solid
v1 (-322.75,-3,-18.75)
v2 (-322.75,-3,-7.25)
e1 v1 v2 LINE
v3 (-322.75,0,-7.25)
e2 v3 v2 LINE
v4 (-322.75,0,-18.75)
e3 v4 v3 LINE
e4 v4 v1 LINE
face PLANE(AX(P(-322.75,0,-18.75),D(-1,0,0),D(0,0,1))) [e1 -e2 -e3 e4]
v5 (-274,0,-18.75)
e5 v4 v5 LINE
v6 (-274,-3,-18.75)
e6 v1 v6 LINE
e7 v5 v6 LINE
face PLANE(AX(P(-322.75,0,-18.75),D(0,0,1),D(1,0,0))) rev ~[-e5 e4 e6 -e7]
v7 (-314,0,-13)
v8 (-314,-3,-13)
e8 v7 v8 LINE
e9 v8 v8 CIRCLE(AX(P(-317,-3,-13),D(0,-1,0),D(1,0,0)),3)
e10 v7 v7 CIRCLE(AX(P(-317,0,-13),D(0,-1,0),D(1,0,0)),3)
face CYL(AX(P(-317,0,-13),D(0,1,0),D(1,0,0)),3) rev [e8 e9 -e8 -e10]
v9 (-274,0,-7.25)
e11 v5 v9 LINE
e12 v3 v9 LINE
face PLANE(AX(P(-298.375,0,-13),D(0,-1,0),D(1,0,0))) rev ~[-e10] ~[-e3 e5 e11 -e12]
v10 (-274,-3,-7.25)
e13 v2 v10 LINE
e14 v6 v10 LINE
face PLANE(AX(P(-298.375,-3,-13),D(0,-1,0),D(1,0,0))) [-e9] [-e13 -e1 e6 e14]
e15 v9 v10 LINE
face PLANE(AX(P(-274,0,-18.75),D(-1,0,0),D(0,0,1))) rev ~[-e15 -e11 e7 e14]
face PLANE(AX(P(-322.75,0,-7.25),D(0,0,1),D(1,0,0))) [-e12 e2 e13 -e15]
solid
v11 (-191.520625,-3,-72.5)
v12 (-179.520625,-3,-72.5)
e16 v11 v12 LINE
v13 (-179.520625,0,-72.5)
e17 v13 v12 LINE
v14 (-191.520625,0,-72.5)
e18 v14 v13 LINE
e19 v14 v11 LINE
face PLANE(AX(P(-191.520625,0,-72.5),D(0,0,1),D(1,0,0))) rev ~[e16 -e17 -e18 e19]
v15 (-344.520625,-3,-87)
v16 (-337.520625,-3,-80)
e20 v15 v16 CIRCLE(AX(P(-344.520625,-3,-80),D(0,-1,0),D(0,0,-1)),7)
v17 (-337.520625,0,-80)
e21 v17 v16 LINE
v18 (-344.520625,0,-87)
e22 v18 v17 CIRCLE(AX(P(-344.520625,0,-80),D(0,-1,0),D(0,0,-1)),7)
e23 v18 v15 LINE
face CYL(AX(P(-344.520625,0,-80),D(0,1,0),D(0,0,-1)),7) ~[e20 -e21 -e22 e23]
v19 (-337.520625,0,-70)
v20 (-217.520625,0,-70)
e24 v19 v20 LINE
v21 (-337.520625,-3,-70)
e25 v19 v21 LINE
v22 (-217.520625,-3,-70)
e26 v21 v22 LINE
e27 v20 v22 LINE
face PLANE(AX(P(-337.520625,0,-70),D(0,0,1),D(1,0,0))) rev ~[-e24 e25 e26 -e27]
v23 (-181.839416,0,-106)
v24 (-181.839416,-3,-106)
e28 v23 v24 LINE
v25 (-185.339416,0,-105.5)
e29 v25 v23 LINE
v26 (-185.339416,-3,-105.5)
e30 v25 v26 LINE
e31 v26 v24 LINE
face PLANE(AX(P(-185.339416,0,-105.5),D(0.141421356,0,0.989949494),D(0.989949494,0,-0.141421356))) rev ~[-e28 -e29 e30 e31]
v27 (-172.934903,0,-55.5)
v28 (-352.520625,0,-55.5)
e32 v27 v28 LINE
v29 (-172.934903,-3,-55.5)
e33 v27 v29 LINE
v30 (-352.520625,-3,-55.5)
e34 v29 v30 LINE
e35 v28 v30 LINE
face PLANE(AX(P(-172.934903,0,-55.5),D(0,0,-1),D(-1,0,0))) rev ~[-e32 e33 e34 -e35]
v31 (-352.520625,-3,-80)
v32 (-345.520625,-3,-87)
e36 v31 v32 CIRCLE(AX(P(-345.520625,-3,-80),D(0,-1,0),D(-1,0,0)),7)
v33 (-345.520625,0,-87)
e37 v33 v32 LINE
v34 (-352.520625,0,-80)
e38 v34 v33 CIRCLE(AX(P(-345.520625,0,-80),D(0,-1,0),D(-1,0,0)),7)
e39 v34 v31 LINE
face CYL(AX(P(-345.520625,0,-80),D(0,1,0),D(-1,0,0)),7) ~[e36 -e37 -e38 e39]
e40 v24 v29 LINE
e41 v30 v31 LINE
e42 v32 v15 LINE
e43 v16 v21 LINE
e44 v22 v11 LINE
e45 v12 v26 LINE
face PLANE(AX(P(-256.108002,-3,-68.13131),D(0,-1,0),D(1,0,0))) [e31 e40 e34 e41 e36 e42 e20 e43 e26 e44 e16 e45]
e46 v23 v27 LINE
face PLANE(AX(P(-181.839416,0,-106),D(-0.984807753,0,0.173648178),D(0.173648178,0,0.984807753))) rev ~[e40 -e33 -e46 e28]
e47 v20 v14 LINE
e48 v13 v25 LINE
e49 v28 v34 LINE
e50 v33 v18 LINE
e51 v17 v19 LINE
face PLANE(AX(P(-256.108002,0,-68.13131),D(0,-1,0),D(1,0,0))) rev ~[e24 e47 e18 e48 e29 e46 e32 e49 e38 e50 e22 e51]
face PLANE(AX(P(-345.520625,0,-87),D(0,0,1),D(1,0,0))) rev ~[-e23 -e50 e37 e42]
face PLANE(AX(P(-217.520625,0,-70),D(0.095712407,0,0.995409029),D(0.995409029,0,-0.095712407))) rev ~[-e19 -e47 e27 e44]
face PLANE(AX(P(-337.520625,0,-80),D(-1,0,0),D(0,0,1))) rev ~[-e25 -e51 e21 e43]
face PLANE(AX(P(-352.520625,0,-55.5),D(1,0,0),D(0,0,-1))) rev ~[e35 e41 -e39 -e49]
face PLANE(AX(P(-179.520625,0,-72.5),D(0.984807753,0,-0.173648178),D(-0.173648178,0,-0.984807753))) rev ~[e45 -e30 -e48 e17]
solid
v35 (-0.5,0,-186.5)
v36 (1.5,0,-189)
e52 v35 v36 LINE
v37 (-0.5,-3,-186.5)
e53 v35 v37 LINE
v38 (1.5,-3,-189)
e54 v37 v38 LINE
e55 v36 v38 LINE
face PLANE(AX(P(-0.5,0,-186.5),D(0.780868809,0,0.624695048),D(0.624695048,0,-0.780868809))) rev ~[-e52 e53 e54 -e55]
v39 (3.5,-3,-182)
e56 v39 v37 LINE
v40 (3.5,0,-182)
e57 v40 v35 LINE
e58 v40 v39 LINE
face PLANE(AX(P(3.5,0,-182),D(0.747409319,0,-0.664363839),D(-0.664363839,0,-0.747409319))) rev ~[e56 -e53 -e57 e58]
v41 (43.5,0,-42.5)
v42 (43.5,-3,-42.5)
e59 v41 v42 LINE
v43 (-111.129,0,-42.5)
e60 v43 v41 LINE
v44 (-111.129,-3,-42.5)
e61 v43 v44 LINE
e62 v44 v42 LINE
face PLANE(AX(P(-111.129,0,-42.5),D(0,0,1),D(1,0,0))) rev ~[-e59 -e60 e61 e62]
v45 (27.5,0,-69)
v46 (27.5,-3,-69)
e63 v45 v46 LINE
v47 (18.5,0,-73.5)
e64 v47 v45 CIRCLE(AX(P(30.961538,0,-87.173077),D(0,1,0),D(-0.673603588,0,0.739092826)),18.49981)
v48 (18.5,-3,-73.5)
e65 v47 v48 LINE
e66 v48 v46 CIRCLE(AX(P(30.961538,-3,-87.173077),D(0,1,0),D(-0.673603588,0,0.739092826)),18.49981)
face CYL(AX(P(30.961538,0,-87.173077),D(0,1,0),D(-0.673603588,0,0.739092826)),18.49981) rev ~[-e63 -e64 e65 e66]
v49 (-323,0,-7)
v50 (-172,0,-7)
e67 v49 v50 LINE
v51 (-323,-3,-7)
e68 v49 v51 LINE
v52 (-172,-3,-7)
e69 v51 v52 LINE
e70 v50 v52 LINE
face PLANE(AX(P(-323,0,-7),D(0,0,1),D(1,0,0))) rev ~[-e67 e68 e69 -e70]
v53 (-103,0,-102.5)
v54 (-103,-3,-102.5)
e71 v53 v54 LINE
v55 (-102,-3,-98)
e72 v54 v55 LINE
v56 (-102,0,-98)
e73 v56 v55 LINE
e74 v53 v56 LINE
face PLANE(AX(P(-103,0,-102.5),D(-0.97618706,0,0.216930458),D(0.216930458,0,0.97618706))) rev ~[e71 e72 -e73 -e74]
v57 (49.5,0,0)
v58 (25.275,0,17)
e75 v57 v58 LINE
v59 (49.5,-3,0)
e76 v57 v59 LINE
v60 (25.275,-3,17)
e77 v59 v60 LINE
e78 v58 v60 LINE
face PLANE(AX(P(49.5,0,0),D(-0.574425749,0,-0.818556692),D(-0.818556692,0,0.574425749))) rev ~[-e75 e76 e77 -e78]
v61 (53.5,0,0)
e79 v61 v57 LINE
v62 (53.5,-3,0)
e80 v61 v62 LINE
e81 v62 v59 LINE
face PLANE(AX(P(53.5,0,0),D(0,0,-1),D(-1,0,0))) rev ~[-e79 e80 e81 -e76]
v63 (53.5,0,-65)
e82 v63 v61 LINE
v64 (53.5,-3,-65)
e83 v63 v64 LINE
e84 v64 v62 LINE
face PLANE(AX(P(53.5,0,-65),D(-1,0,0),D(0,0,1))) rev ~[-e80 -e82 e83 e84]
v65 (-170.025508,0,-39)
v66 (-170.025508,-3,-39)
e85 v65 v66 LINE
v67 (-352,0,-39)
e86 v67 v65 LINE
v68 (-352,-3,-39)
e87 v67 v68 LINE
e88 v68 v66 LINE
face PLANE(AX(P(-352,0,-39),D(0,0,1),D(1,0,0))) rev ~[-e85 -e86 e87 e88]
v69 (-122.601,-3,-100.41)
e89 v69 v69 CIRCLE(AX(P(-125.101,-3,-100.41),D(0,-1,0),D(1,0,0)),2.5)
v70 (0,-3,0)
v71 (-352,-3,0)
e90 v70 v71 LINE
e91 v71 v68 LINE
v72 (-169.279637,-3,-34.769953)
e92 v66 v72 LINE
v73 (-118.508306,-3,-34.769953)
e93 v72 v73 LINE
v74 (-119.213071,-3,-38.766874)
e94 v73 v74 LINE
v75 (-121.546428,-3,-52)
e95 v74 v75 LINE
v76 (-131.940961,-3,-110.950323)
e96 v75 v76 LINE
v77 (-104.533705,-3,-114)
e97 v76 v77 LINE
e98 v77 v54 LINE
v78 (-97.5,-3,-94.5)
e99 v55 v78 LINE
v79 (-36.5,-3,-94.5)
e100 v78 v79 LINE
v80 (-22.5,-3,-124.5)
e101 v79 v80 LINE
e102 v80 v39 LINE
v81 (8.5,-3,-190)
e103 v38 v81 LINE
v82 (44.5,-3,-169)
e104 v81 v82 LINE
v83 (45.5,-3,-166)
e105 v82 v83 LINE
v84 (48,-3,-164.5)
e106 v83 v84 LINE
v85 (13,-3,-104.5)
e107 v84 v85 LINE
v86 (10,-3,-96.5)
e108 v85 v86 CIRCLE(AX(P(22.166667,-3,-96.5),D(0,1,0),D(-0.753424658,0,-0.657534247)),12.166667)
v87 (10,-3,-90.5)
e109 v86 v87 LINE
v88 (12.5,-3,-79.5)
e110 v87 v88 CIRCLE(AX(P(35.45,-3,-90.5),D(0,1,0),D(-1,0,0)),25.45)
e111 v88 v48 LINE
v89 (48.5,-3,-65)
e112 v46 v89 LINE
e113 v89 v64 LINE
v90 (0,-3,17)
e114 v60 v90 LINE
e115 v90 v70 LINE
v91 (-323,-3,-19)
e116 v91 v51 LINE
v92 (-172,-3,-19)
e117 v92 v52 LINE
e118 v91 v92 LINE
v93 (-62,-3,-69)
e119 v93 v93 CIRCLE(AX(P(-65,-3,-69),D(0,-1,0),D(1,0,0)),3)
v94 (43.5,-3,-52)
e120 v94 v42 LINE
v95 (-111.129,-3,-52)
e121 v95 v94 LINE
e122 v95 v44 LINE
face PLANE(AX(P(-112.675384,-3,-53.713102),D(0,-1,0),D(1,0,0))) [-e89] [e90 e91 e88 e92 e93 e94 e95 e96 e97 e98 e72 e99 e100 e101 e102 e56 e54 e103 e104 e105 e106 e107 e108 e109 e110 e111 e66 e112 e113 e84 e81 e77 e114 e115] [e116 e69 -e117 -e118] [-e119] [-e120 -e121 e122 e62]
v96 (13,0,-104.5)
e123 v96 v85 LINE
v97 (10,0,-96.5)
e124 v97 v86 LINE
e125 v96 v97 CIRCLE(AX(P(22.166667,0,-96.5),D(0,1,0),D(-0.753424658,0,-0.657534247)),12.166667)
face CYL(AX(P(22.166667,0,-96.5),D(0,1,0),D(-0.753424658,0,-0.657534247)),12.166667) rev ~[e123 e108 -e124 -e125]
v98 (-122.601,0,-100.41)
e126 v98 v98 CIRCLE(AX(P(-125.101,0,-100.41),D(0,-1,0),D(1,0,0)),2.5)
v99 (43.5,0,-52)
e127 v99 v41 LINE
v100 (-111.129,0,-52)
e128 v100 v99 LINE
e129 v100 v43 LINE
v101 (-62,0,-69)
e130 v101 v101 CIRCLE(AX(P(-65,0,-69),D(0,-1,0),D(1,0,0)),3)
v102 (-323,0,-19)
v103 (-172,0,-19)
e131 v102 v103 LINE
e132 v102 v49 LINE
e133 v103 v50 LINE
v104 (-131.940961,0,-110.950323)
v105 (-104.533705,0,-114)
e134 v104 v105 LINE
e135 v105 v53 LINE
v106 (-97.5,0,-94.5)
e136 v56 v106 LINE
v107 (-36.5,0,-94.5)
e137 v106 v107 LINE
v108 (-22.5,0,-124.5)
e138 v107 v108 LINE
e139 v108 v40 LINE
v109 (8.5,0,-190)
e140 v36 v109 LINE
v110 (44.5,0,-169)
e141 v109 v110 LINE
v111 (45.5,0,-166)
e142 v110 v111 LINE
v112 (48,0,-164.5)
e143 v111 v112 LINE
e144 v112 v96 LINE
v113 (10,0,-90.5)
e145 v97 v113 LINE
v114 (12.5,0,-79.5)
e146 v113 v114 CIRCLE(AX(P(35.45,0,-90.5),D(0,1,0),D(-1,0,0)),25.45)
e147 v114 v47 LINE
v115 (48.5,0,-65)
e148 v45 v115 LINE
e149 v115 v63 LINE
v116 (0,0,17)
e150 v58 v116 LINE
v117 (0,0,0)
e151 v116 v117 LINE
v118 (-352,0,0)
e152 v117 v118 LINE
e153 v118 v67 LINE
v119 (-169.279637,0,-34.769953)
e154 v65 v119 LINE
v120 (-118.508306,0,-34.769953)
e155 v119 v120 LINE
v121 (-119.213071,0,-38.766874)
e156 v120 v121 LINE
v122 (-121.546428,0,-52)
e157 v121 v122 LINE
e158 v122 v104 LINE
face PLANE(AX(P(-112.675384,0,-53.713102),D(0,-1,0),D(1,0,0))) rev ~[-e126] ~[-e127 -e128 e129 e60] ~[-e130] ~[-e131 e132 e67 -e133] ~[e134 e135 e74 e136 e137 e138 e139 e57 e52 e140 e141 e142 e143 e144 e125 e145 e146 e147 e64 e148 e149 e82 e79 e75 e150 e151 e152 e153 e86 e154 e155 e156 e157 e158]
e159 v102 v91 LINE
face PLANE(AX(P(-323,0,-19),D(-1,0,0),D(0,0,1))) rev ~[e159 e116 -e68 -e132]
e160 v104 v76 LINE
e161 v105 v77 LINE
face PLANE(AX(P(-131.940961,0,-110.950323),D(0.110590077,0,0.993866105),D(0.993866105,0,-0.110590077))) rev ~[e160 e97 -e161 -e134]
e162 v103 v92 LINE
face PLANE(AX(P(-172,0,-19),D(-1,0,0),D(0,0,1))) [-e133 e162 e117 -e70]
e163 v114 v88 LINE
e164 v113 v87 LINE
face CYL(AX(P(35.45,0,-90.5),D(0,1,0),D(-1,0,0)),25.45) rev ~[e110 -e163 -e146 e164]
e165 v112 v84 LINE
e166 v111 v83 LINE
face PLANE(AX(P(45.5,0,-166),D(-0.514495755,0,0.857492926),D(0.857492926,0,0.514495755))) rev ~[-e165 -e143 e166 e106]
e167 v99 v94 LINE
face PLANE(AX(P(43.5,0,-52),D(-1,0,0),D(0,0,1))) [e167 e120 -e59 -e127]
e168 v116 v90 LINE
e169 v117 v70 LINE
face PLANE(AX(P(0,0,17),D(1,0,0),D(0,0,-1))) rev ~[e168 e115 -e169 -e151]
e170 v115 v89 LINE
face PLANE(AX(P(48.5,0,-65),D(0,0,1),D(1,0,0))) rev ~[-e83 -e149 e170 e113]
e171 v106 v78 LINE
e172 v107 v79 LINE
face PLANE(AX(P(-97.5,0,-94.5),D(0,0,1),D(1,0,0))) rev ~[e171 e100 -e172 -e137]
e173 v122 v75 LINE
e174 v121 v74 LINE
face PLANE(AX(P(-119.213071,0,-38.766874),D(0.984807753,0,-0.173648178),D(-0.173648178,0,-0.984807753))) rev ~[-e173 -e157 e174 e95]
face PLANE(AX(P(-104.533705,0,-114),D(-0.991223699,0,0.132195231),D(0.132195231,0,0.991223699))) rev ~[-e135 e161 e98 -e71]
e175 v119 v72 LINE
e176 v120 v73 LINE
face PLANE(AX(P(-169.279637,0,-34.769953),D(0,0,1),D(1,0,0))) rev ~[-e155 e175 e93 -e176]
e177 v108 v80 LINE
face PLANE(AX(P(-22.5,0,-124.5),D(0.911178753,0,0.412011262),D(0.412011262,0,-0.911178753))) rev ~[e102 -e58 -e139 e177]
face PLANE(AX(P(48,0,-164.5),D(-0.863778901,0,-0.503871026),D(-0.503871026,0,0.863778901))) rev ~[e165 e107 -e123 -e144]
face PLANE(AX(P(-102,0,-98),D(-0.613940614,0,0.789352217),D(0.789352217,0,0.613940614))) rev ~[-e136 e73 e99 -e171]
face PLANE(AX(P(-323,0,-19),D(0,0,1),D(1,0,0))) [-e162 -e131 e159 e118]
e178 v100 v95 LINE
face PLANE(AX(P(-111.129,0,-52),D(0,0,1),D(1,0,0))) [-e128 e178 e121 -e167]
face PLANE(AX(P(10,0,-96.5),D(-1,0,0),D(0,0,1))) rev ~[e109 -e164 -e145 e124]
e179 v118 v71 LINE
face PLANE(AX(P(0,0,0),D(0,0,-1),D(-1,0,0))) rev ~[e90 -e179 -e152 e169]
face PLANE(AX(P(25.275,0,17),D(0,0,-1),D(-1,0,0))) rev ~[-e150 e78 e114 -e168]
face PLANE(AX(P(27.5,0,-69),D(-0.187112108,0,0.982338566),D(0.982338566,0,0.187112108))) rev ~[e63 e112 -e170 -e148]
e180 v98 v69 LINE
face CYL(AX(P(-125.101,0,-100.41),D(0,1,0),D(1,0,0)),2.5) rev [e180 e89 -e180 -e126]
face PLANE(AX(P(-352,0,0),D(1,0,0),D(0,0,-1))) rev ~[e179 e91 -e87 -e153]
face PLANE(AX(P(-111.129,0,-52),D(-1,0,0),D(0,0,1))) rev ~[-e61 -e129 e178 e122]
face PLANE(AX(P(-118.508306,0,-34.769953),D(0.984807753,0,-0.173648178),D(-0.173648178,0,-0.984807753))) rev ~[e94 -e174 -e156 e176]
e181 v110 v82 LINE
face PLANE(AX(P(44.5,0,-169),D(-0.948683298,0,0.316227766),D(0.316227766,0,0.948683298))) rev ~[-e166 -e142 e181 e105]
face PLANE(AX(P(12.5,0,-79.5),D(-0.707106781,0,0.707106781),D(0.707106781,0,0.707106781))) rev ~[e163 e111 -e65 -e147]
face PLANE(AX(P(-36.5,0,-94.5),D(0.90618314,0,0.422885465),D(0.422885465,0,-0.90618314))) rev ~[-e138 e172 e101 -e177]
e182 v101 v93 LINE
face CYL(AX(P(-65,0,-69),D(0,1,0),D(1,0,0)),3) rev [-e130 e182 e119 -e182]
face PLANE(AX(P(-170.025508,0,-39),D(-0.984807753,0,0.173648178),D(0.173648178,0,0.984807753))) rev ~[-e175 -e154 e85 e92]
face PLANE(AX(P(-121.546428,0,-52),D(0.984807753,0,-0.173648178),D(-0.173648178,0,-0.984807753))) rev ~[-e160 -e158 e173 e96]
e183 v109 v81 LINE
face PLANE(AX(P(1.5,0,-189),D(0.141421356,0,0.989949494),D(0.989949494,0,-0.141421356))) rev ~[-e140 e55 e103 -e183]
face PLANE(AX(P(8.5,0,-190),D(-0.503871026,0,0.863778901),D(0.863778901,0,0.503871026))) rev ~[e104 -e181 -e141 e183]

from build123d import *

# Parameters (mm, degrees)
F0_R     = 2.5
F0_W     = 151
F0_H     = 12
F0_R_2   = 3
F0_W_2   = 154.629
F0_H_2   = 9.5
F1_DEPTH = 3
F0_W_3   = 48.75
F0_H_3   = 11.5


# Not quite as in the source:
# - a feature names something its author has since deleted; it is built from what else it names


with BuildPart() as f1:
    # F0 (on Front) → F1 (new body)
    with BuildSketch(Plane.XZ):
        with BuildLine():
            Line((48.5, -65), (53.5, -65))
            Line((53.5, -65), (53.5, 0))
            Line((53.5, 0), (49.5, 0))
            Line((49.5, 0), (25.275, 17))
            Line((25.275, 17), (0, 17))
            Line((0, 17), (0, 0))
            Line((0, 0), (-352, 0))
            Line((-352, 0), (-352, -39))
            Line((-352, -39), (-170.0255081496, -39))
            Line((-170.0255081496, -39), (-169.2796367248, -34.7699529486))
            Line((-169.2796367248, -34.7699529486), (-118.5083061305, -34.7699529486))
            Line((-118.5083061305, -34.7699529486), (-119.2130711177, -38.7668738074))
            Line((-119.2130711177, -38.7668738074), (-121.5464283045, -52))
            Line((-121.5464283045, -52), (-131.9409607911, -110.9503231145))
            Line((-131.9409607911, -110.9503231145), (-104.5337054221, -114))
            Line((-104.5337054221, -114), (-103, -102.5))
            Line((-103, -102.5), (-102, -98))
            Line((-102, -98), (-97.5, -94.5))
            Line((-97.5, -94.5), (-36.5, -94.5))
            Line((-36.5, -94.5), (-22.5, -124.5))
            Line((-22.5, -124.5), (3.5, -182))
            Line((3.5, -182), (-0.5, -186.5))
            Line((-0.5, -186.5), (1.5, -189))
            Line((1.5, -189), (8.5, -190))
            Line((8.5, -190), (44.5, -169))
            Line((44.5, -169), (45.5, -166))
            Line((45.5, -166), (48, -164.5))
            Line((48, -164.5), (13, -104.5))
            ThreePointArc((13, -104.5), (10.7746616729, -100.7720018727), (10, -96.5))
            Line((10, -96.5), (10, -90.5))
            ThreePointArc((10, -90.5), (10.6328688201, -84.8597429137), (12.5, -79.5))
            Line((12.5, -79.5), (18.5, -73.5))
            ThreePointArc((18.5, -73.5), (22.688171875, -70.6263437501), (27.5, -69))
            Line((27.5, -69), (48.5, -65))
        make_face()
        with Locations((-125.101, -100.41)):
            Circle(F0_R, mode=Mode.SUBTRACT)
        with Locations((-247.5, -13)):
            Rectangle(F0_W, F0_H, mode=Mode.SUBTRACT)
        with Locations((-65, -69)):
            Circle(F0_R_2, mode=Mode.SUBTRACT)
        with Locations((-33.8145, -47.25)):
            Rectangle(F0_W_2, F0_H_2, mode=Mode.SUBTRACT)
    extrude(amount=F1_DEPTH)


with BuildPart() as f1b:
    # F0 (on Front) → F1, piece 2 (new body)
    with BuildSketch(Plane.XZ):
        with BuildLine():
            ThreePointArc((-352.5206254937, -80), (-350.470372962, -84.9497474683), (-345.5206254937, -87))
            Line((-345.5206254937, -87), (-344.5206254937, -87))
            ThreePointArc((-344.5206254937, -87), (-339.5708780254, -84.9497474683), (-337.5206254937, -80))
            Line((-337.5206254937, -80), (-337.5206254937, -70))
            Line((-337.5206254937, -70), (-217.5206254937, -70))
            Line((-217.5206254937, -70), (-191.5206254937, -72.5))
            Line((-191.5206254937, -72.5), (-179.5206254937, -72.5))
            Line((-179.5206254937, -72.5), (-185.3394158571, -105.5))
            Line((-185.3394158571, -105.5), (-181.8394158571, -106))
            Line((-181.8394158571, -106), (-172.9349033313, -55.5))
            Line((-172.9349033313, -55.5), (-352.5206254937, -55.5))
            Line((-352.5206254937, -55.5), (-352.5206254937, -80))
        make_face()
    extrude(amount=F1_DEPTH)


with BuildPart() as f1c:
    # F0 (on Front) → F1, piece 3 (new body)
    with BuildSketch(Plane.XZ):
        with Locations((-298.375, -13)):
            Rectangle(F0_W_3, F0_H_3)
        with Locations((-317, -13)):
            Circle(F0_R_2, mode=Mode.SUBTRACT)
    extrude(amount=F1_DEPTH)


solid = Compound([f1.part, f1b.part, f1c.part])
